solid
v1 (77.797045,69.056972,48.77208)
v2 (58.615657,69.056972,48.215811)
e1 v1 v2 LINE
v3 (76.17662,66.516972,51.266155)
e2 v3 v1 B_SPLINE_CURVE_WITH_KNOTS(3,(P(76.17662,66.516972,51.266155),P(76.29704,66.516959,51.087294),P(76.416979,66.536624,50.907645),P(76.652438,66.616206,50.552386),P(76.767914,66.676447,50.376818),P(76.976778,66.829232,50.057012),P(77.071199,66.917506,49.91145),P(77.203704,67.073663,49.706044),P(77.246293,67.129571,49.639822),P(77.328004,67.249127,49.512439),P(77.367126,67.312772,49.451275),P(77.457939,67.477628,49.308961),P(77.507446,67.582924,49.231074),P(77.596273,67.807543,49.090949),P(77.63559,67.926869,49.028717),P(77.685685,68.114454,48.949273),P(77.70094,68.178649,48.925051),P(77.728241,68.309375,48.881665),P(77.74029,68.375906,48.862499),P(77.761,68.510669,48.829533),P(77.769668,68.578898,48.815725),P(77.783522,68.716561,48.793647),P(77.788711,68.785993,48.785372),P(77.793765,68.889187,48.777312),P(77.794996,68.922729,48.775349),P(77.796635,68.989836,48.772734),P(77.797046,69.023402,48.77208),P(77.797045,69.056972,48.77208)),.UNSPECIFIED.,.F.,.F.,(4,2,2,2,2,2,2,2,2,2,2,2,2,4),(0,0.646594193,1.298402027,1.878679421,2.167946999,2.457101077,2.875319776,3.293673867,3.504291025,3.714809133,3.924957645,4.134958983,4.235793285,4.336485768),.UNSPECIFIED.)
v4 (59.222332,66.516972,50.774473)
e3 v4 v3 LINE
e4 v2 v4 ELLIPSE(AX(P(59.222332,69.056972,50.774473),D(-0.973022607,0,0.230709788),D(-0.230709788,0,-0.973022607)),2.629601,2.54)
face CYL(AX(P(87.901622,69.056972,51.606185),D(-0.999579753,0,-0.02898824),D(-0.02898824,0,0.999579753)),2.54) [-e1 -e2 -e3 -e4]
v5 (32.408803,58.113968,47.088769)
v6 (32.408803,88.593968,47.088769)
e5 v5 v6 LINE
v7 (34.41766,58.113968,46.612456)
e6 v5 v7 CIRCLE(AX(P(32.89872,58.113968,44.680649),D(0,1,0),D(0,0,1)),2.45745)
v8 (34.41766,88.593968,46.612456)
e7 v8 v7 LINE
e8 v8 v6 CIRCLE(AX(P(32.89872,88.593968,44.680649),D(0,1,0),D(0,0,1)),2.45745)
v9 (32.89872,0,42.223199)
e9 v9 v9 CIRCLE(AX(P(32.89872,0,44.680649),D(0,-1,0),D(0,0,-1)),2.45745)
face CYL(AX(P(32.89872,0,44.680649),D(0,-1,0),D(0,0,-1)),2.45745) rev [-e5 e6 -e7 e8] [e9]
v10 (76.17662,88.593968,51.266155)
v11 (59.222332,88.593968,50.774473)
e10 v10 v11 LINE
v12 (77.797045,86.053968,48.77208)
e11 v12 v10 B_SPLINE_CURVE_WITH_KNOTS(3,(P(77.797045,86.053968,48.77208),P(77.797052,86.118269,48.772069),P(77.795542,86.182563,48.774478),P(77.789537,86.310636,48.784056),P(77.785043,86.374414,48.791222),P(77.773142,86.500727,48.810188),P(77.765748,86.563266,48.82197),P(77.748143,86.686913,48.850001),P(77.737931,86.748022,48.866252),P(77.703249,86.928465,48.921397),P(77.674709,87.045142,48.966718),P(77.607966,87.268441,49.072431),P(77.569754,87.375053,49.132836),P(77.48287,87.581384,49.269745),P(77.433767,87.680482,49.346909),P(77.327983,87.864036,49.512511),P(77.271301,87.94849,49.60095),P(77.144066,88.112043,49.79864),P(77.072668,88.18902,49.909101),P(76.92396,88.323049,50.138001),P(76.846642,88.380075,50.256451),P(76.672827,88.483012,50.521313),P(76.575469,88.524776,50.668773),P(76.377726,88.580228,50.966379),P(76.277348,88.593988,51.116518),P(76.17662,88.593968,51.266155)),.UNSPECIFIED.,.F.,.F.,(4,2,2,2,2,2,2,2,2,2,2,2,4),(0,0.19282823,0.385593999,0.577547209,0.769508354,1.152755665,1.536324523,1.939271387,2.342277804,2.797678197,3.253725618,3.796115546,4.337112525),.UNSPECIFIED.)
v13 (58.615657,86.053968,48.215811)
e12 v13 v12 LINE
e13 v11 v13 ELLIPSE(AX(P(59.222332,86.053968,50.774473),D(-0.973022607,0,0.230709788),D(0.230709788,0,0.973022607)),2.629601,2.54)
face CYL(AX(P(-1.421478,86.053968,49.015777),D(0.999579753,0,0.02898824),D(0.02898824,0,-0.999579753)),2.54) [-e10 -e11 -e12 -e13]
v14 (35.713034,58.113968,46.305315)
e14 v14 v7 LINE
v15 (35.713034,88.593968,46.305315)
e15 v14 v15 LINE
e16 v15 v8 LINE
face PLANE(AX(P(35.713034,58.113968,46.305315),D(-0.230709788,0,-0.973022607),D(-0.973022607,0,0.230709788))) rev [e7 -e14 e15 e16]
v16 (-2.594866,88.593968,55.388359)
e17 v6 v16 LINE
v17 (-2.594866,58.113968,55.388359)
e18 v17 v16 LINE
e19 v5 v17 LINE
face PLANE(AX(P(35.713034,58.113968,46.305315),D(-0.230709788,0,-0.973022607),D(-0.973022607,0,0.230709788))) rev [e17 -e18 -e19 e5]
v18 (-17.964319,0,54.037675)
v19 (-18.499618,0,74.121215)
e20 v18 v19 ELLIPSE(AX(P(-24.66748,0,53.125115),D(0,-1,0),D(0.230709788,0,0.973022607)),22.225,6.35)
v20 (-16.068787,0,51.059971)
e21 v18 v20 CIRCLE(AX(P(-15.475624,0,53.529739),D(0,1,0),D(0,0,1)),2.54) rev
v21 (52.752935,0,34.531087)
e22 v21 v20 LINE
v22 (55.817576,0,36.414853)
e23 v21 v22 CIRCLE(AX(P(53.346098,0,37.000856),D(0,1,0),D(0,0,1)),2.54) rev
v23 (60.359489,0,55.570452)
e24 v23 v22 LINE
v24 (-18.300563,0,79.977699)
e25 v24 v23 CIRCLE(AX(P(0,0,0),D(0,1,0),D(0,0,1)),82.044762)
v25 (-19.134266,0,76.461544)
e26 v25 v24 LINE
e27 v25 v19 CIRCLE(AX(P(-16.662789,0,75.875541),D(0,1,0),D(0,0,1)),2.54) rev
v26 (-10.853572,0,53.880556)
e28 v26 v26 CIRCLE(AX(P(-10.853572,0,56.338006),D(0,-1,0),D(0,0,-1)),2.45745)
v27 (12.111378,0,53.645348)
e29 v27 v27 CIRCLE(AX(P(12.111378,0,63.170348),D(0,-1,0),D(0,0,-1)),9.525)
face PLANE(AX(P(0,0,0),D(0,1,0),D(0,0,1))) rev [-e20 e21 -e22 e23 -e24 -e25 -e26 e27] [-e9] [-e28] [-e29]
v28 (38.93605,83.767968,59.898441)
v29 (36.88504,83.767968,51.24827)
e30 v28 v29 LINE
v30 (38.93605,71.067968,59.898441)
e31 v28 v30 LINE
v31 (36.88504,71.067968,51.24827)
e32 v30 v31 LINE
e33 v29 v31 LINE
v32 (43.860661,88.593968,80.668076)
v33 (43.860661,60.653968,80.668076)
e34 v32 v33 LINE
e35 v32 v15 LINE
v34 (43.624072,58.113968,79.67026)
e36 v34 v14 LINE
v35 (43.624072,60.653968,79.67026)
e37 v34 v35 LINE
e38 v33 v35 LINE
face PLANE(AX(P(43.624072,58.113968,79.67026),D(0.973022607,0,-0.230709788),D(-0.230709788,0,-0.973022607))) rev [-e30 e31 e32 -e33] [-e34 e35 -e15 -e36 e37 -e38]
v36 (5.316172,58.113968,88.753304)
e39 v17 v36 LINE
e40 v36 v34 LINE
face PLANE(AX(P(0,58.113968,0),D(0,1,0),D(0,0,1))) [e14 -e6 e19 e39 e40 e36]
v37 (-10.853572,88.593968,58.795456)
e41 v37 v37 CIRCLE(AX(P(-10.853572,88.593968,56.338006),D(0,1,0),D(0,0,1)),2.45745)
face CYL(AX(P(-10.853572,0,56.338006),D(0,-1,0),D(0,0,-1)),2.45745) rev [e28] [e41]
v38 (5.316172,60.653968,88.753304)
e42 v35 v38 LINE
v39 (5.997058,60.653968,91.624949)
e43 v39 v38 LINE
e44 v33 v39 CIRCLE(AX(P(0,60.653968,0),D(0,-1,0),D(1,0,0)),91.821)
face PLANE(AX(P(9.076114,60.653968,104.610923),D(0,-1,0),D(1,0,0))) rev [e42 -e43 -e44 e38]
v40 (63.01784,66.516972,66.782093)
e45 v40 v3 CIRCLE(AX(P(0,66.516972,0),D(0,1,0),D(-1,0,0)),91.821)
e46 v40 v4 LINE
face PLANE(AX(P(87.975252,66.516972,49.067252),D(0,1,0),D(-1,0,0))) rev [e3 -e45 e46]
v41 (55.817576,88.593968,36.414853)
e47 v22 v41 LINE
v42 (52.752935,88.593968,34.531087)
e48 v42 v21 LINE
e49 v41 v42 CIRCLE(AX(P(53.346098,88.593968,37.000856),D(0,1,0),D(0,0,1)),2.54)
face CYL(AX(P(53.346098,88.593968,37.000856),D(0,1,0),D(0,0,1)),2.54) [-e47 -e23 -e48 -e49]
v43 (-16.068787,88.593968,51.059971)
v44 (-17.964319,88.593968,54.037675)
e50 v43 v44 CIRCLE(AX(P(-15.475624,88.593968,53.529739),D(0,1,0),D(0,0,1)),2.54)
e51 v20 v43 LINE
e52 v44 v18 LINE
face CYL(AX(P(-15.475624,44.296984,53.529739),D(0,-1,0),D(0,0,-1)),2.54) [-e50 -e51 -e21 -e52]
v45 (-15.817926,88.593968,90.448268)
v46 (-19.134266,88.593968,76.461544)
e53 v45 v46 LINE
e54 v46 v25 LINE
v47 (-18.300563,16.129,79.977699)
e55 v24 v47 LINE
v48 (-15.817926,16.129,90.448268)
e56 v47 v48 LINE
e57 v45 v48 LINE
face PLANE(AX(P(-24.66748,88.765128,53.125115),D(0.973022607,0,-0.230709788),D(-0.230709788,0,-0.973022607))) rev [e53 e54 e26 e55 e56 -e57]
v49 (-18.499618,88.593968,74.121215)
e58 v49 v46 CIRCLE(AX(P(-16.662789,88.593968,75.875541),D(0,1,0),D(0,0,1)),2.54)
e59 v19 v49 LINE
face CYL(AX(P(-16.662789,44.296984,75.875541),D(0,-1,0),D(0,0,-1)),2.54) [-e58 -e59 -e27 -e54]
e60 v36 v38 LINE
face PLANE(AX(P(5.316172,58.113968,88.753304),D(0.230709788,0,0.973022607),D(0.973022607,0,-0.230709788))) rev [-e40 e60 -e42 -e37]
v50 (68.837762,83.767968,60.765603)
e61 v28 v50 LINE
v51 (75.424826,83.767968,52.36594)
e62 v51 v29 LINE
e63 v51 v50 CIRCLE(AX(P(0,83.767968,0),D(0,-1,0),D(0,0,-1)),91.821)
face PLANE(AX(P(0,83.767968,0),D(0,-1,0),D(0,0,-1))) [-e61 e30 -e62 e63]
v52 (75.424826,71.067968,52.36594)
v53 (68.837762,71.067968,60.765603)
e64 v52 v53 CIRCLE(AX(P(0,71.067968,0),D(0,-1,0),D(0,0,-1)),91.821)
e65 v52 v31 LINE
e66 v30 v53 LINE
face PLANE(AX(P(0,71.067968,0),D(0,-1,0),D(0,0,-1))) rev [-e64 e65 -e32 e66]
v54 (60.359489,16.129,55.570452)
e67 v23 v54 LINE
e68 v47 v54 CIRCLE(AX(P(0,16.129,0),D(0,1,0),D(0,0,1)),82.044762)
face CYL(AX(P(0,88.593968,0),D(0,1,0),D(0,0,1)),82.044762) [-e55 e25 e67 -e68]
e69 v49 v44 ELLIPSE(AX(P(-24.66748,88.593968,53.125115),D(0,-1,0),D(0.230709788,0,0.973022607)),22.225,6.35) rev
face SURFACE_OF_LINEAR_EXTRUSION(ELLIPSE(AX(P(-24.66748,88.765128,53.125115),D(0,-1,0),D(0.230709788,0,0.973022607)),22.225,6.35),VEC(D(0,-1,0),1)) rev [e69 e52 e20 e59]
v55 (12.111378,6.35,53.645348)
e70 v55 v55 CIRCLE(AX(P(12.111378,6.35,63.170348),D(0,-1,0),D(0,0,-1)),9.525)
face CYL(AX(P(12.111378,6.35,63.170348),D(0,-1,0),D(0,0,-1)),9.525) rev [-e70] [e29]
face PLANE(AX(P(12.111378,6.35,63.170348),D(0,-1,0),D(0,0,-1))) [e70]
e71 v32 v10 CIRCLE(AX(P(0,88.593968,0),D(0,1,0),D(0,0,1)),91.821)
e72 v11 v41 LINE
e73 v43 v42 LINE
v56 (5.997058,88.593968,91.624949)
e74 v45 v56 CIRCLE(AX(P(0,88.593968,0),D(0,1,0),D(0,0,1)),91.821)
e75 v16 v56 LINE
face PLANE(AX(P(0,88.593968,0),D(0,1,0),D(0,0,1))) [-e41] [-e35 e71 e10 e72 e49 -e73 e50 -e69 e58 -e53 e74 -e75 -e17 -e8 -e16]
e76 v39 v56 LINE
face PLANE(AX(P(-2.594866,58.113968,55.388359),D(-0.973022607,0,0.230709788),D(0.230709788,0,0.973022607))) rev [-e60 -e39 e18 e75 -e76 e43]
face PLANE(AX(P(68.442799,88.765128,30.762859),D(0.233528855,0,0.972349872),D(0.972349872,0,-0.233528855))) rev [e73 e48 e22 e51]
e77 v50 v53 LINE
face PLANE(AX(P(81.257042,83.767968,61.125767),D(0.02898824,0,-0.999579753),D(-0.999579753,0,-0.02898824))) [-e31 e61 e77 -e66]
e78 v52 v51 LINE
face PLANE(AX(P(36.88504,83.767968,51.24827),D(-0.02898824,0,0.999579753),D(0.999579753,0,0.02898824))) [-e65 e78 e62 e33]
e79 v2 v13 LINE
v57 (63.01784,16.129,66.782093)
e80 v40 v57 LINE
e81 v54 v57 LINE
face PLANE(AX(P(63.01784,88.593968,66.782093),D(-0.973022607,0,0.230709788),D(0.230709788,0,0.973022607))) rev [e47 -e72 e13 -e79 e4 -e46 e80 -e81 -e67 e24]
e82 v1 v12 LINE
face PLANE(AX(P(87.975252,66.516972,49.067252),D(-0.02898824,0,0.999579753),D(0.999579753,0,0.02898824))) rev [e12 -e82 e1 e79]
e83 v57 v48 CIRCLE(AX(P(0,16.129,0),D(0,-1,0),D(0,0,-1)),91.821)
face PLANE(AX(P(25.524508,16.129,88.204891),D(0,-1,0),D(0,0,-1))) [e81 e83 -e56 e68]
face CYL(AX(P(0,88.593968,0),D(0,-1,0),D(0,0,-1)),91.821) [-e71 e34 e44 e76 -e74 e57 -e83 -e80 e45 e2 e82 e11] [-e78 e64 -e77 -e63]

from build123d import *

# Parameters (mm, degrees)
BOSS_EXTRUDE1_DEPTH          = 88.5939681
CUT_EXTRUDE5_DEPTH           = 30.48
SKETCH13_W                   = 39.37
SKETCH13_H                   = 27.94
CUT_EXTRUDE6_DEPTH           = 121.173808566
SKETCH17_W                   = 9.779
SKETCH17_H                   = 16.129
SKETCH20_W                   = 22.076995977
SKETCH20_H                   = 19.05
BOSS_EXTRUDE2_DEPTH          = 43.18
CUT_EXTRUDE9_START           = -22.076995977
CUT_EXTRUDE9_DEPTH           = 22.076995977
FILLET2_R                    = 2.54
CUT_EXTRUDE11_DEPTH          = 150.440180481
F_10_0_1935_DIAMETER_HOLE1_D = 4.9149
CUT_EXTRUDE14_DEPTH          = 12.7
FILLET5_R                    = 2.54
SKETCH31_RX                  = 22.225
SKETCH31_RY                  = 6.35
CUT_EXTRUDE16_DEPTH          = 150.440180481
FILLET6_R                    = 2.54
SKETCH32_R                   = 9.525
CUT_EXTRUDE17_DEPTH          = 6.35


# Read off the part's stored shape, not the designer's step: Cut-Extrude9
with BuildPart() as part:
    # Sketch1 → Boss-Extrude1 (new body)
    with BuildSketch(Plane(origin=(0, 0, 0), x_dir=(1, 0, 0), z_dir=(0, 1, 0))):
        with BuildLine():
            Line((63.017839503, -66.782093), (53.468205472, -26.506342671))
            Line((53.468205472, -26.506342671), (-35.875703335, -47.690346072))
            Line((-35.875703335, -47.690346072), (-26.326069304, -87.966096401))
            ThreePointArc((-26.326069304, -87.966096401), (21.184003401, -89.343908807), (63.017839503, -66.782093))
        make_face()
    extrude(amount=BOSS_EXTRUDE1_DEPTH)

    # Sketch12 → Cut-Extrude5 (cut)
    with BuildSketch(Plane(origin=(0, 88.5939681, 0), x_dir=(1, 0, 0), z_dir=(0, 1, 0))):
        Polygon((5.316172436, -88.753304237), (43.624072478, -79.670259902), (35.713033863, -46.305314704), (-2.594866179, -55.388359039), align=None)
    extrude(amount=-CUT_EXTRUDE5_DEPTH, mode=Mode.SUBTRACT)

    # Sketch13 → Cut-Extrude6 (cut, through all)
    with BuildSketch(Plane(origin=(20.206823904, 0, 85.222637004), x_dir=(-0.9730226071044289, 0, 0.23070978753338656), z_dir=(-0.23070978753338653, 0, -0.9730226071044288))):
        with Locations((-4.3815, 74.6239681)):
            Rectangle(SKETCH13_W, SKETCH13_H)
    extrude(amount=-CUT_EXTRUDE6_DEPTH, mode=Mode.SUBTRACT)

    # Sketch17 → Cut-Revolve1 (revolve, cut)
    with BuildSketch(Plane(origin=(0, 0, 0), x_dir=(0.2779727925443418, 0, 0.9605889477841708), z_dir=(-0.9605889477841708, 0, 0.2779727925443418))):
        with Locations((86.934262311, 8.0645)):
            Rectangle(SKETCH17_W, SKETCH17_H)
    revolve(axis=Axis((0, 88.5939681, 0), (0, -1, 0)), mode=Mode.SUBTRACT)

    # Sketch20 → Boss-Extrude2 (add)
    with BuildSketch(Plane(origin=(46.161246838, 0, 1.33869588), x_dir=(0, -1, 0), z_dir=(0.9995797526704859, 0, 0.02898823987775881))):
        with Locations((-77.555470112, -56.021383933)):
            Rectangle(SKETCH20_W, SKETCH20_H)
    extrude(amount=BOSS_EXTRUDE2_DEPTH)

    # Cut-Extrude9 outline → Cut-Extrude9 (cut)
    with BuildSketch(Plane(origin=(0, 88.5939681, 0), x_dir=(1, 0, 0), z_dir=(0, 1, 0)).offset(CUT_EXTRUDE9_START)):
        with BuildLine():
            Line((87.975252227, -49.06725203), (77.797045472, -48.772079686))
            ThreePointArc((77.797045472, -48.772079686), (70.701096399, -58.587123236), (62.37506144, -67.382844638))
            Line((62.37506144, -67.382844638), (87.423026258, -68.109246318))
            Line((87.423026258, -68.109246318), (87.975252227, -49.06725203))
        make_face()
    extrude(amount=CUT_EXTRUDE9_DEPTH, mode=Mode.SUBTRACT)

    # Fillet2
    fillet2_edges = [part.edges().sort_by_distance(p)[0] for p in [
        (68.206351325, 66.516972123, 48.493945458),
        (68.206351325, 88.5939681, 48.493945458),
        (-35.875703335, 44.29698405, 47.690346072),
        (53.468205472, 44.29698405, 26.506342671),
    ]]
    fillet(fillet2_edges, radius=FILLET2_R)

    # Sketch25 → Cut-Extrude11 (cut, through all)
    with BuildSketch(Plane.XZ):
        Polygon((-24.667480264, 53.125115211), (-13.767913037, 99.094232658), (-26.000188569, 101.994582217), (-40.190153369, 42.148154842), (65.286931214, 17.138873869), (68.442798797, 30.762859127), align=None)
    extrude(amount=-CUT_EXTRUDE11_DEPTH, mode=Mode.SUBTRACT)

    # #10 (0.1935) Diameter Hole1 (through all)
    with Locations(Plane(origin=(0, 0, 0), x_dir=(-1, 0, 0), z_dir=(0, -1, 0))):
        with Locations((10.85357172, -56.338005803), (-32.898719503, -44.680648661)):
            Hole(F_10_0_1935_DIAMETER_HOLE1_D / 2)

    # Sketch30 → Cut-Extrude14 (cut)
    with BuildSketch(Plane(origin=(0, 71.0679681, 0), x_dir=(1, 0, 0), z_dir=(0, 1, 0))):
        Polygon((30.706346029, -52.713276699), (36.885039584, -51.248269548), (81.505966291, -52.542295486), (81.257041939, -61.125767384), (38.936049595, -59.898440526), (32.75735604, -61.363447676), align=None)
    extrude(amount=CUT_EXTRUDE14_DEPTH, mode=Mode.SUBTRACT)

    # Fillet5
    fillet5_edges = [part.edges().sort_by_distance(p)[0] for p in [
        (55.229871942, 44.29698405, 33.936202145),
    ]]
    fillet(fillet5_edges, radius=FILLET5_R)

    # Sketch31 → Cut-Extrude16 (cut, through all)
    with BuildSketch(Plane.XZ):
        with Locations(Location((-24.667480264, 53.125115211), (0, 0, 76.661136503))):
            Ellipse(SKETCH31_RX, SKETCH31_RY)
    extrude(amount=-CUT_EXTRUDE16_DEPTH, mode=Mode.SUBTRACT)

    # Fillet6
    fillet6_edges = [part.edges().sort_by_distance(p)[0] for p in [
        (-18.49303476, 44.29698405, 51.642201263),
        (-19.539955236, 44.29698405, 74.750542654),
    ]]
    fillet(fillet6_edges, radius=FILLET6_R)

    # Sketch32 → Cut-Extrude17 (cut)
    with BuildSketch(Plane.XZ):
        with Locations(Location((12.111377962, 63.170347591, 0), (0, 0, 270))):
            Circle(SKETCH32_R)
    extrude(amount=-CUT_EXTRUDE17_DEPTH, mode=Mode.SUBTRACT)


solid = part.part
